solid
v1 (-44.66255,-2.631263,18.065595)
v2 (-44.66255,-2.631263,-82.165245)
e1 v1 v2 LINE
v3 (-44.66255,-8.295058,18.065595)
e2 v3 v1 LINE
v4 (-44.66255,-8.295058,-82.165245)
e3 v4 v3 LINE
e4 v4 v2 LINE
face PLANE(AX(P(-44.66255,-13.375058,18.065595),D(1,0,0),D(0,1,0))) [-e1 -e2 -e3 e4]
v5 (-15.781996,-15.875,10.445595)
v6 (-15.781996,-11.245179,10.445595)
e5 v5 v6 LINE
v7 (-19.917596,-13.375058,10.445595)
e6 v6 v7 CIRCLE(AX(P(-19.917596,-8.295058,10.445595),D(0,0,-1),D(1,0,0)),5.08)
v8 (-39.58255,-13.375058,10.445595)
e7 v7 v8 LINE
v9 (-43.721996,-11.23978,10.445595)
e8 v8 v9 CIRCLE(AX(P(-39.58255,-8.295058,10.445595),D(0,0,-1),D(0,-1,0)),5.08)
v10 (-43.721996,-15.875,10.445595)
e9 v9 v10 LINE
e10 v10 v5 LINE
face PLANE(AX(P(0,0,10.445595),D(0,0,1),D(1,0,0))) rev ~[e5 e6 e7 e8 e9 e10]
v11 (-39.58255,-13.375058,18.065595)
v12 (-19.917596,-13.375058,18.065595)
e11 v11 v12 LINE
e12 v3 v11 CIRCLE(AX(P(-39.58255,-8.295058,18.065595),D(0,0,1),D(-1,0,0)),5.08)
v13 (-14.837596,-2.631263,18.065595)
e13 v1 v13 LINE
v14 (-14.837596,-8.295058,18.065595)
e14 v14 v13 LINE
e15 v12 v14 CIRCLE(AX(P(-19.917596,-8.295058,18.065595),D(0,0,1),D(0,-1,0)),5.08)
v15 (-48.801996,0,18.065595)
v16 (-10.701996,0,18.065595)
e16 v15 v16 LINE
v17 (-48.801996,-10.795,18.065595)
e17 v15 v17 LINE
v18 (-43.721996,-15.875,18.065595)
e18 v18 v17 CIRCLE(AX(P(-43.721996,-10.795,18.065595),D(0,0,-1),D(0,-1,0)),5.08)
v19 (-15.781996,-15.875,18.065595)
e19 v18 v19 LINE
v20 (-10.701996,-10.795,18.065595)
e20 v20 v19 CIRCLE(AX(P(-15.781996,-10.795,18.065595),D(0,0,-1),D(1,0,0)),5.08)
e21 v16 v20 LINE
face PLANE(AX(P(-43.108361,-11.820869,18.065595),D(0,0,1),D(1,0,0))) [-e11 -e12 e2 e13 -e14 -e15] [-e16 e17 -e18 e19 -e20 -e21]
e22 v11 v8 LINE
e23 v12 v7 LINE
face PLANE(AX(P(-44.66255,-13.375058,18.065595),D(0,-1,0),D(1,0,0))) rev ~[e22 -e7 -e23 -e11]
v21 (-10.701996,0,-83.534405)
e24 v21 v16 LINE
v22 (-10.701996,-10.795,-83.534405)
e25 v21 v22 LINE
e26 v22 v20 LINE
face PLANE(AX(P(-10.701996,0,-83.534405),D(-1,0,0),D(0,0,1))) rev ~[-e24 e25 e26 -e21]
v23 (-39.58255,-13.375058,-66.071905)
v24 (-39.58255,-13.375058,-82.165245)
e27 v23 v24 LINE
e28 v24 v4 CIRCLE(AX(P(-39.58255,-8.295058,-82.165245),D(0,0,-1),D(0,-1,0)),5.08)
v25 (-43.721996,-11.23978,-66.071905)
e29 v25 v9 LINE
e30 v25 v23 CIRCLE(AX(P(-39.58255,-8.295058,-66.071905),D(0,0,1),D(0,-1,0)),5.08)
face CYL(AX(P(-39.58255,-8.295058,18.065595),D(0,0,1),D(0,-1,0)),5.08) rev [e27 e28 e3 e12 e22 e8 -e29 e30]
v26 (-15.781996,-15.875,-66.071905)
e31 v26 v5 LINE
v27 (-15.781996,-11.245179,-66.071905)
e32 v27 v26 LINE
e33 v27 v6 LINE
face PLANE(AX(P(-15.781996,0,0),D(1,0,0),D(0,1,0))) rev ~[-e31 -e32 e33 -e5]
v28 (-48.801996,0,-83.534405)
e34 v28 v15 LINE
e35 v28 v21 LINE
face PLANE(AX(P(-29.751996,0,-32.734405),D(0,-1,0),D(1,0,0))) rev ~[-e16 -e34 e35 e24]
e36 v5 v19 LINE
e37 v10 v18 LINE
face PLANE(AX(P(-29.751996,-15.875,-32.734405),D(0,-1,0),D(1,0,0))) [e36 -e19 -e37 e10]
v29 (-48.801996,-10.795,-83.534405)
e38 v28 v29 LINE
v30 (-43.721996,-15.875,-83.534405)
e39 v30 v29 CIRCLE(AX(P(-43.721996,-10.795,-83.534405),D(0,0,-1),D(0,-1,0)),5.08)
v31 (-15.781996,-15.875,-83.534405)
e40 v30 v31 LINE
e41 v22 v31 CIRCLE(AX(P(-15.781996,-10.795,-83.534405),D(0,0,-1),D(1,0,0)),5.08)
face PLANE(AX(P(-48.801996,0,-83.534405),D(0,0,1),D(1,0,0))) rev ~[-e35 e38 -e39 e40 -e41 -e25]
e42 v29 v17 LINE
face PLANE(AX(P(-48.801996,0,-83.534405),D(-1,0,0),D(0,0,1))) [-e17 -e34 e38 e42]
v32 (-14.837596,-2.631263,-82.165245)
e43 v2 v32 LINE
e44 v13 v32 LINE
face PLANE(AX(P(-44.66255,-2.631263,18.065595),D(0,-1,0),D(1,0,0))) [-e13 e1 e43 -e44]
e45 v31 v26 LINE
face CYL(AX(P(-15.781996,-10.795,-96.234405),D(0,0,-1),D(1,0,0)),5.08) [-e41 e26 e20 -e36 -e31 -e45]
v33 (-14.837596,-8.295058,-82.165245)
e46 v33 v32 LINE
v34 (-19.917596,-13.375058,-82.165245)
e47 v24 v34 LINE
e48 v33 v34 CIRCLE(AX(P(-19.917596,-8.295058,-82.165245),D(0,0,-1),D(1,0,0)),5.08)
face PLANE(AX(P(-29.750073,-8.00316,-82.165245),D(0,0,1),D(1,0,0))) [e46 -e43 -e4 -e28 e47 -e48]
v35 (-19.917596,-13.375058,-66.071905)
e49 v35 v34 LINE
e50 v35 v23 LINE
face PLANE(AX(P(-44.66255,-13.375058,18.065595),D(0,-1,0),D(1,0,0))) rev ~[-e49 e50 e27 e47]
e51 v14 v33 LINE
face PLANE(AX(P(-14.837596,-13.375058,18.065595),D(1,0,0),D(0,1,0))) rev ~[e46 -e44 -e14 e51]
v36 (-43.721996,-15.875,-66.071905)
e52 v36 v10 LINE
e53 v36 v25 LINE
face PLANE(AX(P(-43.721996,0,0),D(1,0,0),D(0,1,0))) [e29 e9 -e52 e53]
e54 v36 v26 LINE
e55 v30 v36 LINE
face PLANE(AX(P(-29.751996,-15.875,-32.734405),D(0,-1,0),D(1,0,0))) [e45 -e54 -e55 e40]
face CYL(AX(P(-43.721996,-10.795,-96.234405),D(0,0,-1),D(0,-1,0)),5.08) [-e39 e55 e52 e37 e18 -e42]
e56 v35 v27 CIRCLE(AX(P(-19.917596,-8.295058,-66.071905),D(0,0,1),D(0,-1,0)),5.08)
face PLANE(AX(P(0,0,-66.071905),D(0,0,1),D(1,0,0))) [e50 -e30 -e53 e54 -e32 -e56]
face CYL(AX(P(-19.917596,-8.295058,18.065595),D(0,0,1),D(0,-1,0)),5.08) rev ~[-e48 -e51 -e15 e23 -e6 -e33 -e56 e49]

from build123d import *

# Parameters (mm, degrees)
F0_W         = 38.1
F0_H         = 101.6
F1_DEPTH     = 15.875
F2_W         = 27.94
F2_H         = 76.5175
F3_DEPTH     = 12.7
F4_W         = 29.8249544576
F4_H         = 10.7437949628
F5_DEPTH     = 100.23084
F6_T4_DEPTH  = 100.23084
F6_T10_DEPTH = 100.23084
F6_T16_DEPTH = 100.23084
F6_T23_DEPTH = 100.23084
F6_T29_DEPTH = 100.23084
F6_T35_DEPTH = 100.23084
F6_T41_DEPTH = 100.23084
F6_T47_DEPTH = 100.23084
F6_T54_DEPTH = 100.23084
F6_T60_DEPTH = 100.23084
F6_T63_DEPTH = 127


# Not quite as in the source:
# - a fillet or chamfer that OpenCascade refuses, or shapes differently, is made with other operations: its cross-section is extruded or revolved along the edge and cut away or added


with BuildPart() as f1:
    # F0 (on Front) → F1 (new body)
    with BuildSketch(Plane.XZ):
        with Locations((-29.7519958138, -32.7344046354)):
            Rectangle(F0_W, F0_H)
    extrude(amount=F1_DEPTH)

    # F2 (on face) → F3 (cut)
    with BuildSketch(Plane.XZ.offset(15.875)):
        with Locations((-29.7519958138, -27.8131546354)):
            Rectangle(F2_W, F2_H)
    extrude(amount=-F3_DEPTH, mode=Mode.SUBTRACT)

    # F4 (on face) → F5 (cut)
    with BuildSketch(Plane.XY.offset(18.0655953646)):
        with Locations((-29.750072863, -8.0031603575)):
            Rectangle(F4_W, F4_H)
    extrude(amount=-F5_DEPTH, mode=Mode.SUBTRACT)

    # F6: fillet of radius 5.08 on 4 edges, made by hand


with BuildPart() as f6_tool2:
    # F6_s3 → F6_t4 (new body)
    with BuildSketch(Plane.XY.offset(18.0655953646)):
        with BuildLine():
            ThreePointArc((-19.9175956342, -13.3750578389), (-16.3254931857, -11.8871602873), (-14.8375956342, -8.2950578389))
            Line((-14.8375956342, -8.2950578389), (-14.8375956342, -13.3750578389))
            Line((-14.8375956342, -13.3750578389), (-19.9175956342, -13.3750578389))
        make_face()
    extrude(amount=-F6_T4_DEPTH)

    split(bisect_by=Plane.YZ.offset(-15.7819958138), keep=Keep.BOTTOM)

    split(bisect_by=Plane.XY.offset(10.4455953646), keep=Keep.TOP)


with BuildPart() as f1_1:
    add(f1.part)

    # F6_t1: union F6_tool2
    add(f6_tool2.part)


with BuildPart() as f6_tool8:
    # F6_s9 → F6_t10 (new body)
    with BuildSketch(Plane.XY.offset(18.0655953646)):
        with BuildLine():
            ThreePointArc((-19.9175956342, -13.3750578389), (-16.3254931857, -11.8871602873), (-14.8375956342, -8.2950578389))
            Line((-14.8375956342, -8.2950578389), (-14.8375956342, -13.3750578389))
            Line((-14.8375956342, -13.3750578389), (-19.9175956342, -13.3750578389))
        make_face()
    extrude(amount=-F6_T10_DEPTH)

    split(bisect_by=Plane.YZ.offset(-15.7819958138), keep=Keep.TOP)

    split(bisect_by=Plane.XY.offset(10.4455953646), keep=Keep.TOP)


with BuildPart() as f1_2:
    add(f1_1.part)

    # F6_t7: union F6_tool8
    add(f6_tool8.part)


with BuildPart() as f6_tool14:
    # F6_s15 → F6_t16 (new body)
    with BuildSketch(Plane.XY.offset(18.0655953646)):
        with BuildLine():
            ThreePointArc((-19.9175956342, -13.3750578389), (-16.3254931857, -11.8871602873), (-14.8375956342, -8.2950578389))
            Line((-14.8375956342, -8.2950578389), (-14.8375956342, -13.3750578389))
            Line((-14.8375956342, -13.3750578389), (-19.9175956342, -13.3750578389))
        make_face()
    extrude(amount=-F6_T16_DEPTH)

    split(bisect_by=Plane.XY.offset(-66.0719046354), keep=Keep.TOP)

    split(bisect_by=Plane.YZ.offset(-15.7819958138), keep=Keep.TOP)

    split(bisect_by=Plane.XY.offset(10.4455953646), keep=Keep.BOTTOM)


with BuildPart() as f1_3:
    add(f1_2.part)

    # F6_t13: union F6_tool14
    add(f6_tool14.part)


with BuildPart() as f6_tool21:
    # F6_s22 → F6_t23 (new body)
    with BuildSketch(Plane.XY.offset(18.0655953646)):
        with BuildLine():
            ThreePointArc((-19.9175956342, -13.3750578389), (-16.3254931857, -11.8871602873), (-14.8375956342, -8.2950578389))
            Line((-14.8375956342, -8.2950578389), (-14.8375956342, -13.3750578389))
            Line((-14.8375956342, -13.3750578389), (-19.9175956342, -13.3750578389))
        make_face()
    extrude(amount=-F6_T23_DEPTH)

    split(bisect_by=Plane.XY.offset(-66.0719046354), keep=Keep.BOTTOM)

    split(bisect_by=Plane.YZ.offset(-15.7819958138), keep=Keep.BOTTOM)


with BuildPart() as f1_4:
    add(f1_3.part)

    # F6_t20: union F6_tool21
    add(f6_tool21.part)


with BuildPart() as f6_tool27:
    # F6_s28 → F6_t29 (new body)
    with BuildSketch(Plane.XY.offset(18.0655953646)):
        with BuildLine():
            ThreePointArc((-19.9175956342, -13.3750578389), (-16.3254931857, -11.8871602873), (-14.8375956342, -8.2950578389))
            Line((-14.8375956342, -8.2950578389), (-14.8375956342, -13.3750578389))
            Line((-14.8375956342, -13.3750578389), (-19.9175956342, -13.3750578389))
        make_face()
    extrude(amount=-F6_T29_DEPTH)

    split(bisect_by=Plane.XY.offset(-66.0719046354), keep=Keep.BOTTOM)

    split(bisect_by=Plane.YZ.offset(-15.7819958138), keep=Keep.TOP)


with BuildPart() as f1_5:
    add(f1_4.part)

    # F6_t26: union F6_tool27
    add(f6_tool27.part)


with BuildPart() as f6_tool33:
    # F6_s34 → F6_t35 (new body)
    with BuildSketch(Plane.XY.offset(18.0655953646)):
        with BuildLine():
            ThreePointArc((-39.5825500917, -13.3750578389), (-43.1746525402, -11.8871602873), (-44.6625500917, -8.2950578389))
            Line((-44.6625500917, -8.2950578389), (-44.6625500917, -13.3750578389))
            Line((-44.6625500917, -13.3750578389), (-39.5825500917, -13.3750578389))
        make_face()
    extrude(amount=-F6_T35_DEPTH)

    split(bisect_by=Plane.YZ.offset(-43.7219958138), keep=Keep.TOP)

    split(bisect_by=Plane.XY.offset(10.4455953646), keep=Keep.TOP)


with BuildPart() as f1_6:
    add(f1_5.part)

    # F6_t32: union F6_tool33
    add(f6_tool33.part)


with BuildPart() as f6_tool39:
    # F6_s40 → F6_t41 (new body)
    with BuildSketch(Plane.XY.offset(18.0655953646)):
        with BuildLine():
            ThreePointArc((-39.5825500917, -13.3750578389), (-43.1746525402, -11.8871602873), (-44.6625500917, -8.2950578389))
            Line((-44.6625500917, -8.2950578389), (-44.6625500917, -13.3750578389))
            Line((-44.6625500917, -13.3750578389), (-39.5825500917, -13.3750578389))
        make_face()
    extrude(amount=-F6_T41_DEPTH)

    split(bisect_by=Plane.YZ.offset(-43.7219958138), keep=Keep.BOTTOM)

    split(bisect_by=Plane.XY.offset(10.4455953646), keep=Keep.TOP)


with BuildPart() as f1_7:
    add(f1_6.part)

    # F6_t38: union F6_tool39
    add(f6_tool39.part)


with BuildPart() as f6_tool45:
    # F6_s46 → F6_t47 (new body)
    with BuildSketch(Plane.XY.offset(18.0655953646)):
        with BuildLine():
            ThreePointArc((-39.5825500917, -13.3750578389), (-43.1746525402, -11.8871602873), (-44.6625500917, -8.2950578389))
            Line((-44.6625500917, -8.2950578389), (-44.6625500917, -13.3750578389))
            Line((-44.6625500917, -13.3750578389), (-39.5825500917, -13.3750578389))
        make_face()
    extrude(amount=-F6_T47_DEPTH)

    split(bisect_by=Plane.YZ.offset(-43.7219958138), keep=Keep.BOTTOM)

    split(bisect_by=Plane.XY.offset(-66.0719046354), keep=Keep.TOP)

    split(bisect_by=Plane.XY.offset(10.4455953646), keep=Keep.BOTTOM)


with BuildPart() as f1_8:
    add(f1_7.part)

    # F6_t44: union F6_tool45
    add(f6_tool45.part)


with BuildPart() as f6_tool52:
    # F6_s53 → F6_t54 (new body)
    with BuildSketch(Plane.XY.offset(18.0655953646)):
        with BuildLine():
            ThreePointArc((-39.5825500917, -13.3750578389), (-43.1746525402, -11.8871602873), (-44.6625500917, -8.2950578389))
            Line((-44.6625500917, -8.2950578389), (-44.6625500917, -13.3750578389))
            Line((-44.6625500917, -13.3750578389), (-39.5825500917, -13.3750578389))
        make_face()
    extrude(amount=-F6_T54_DEPTH)

    split(bisect_by=Plane.YZ.offset(-43.7219958138), keep=Keep.TOP)

    split(bisect_by=Plane.XY.offset(-66.0719046354), keep=Keep.BOTTOM)


with BuildPart() as f1_9:
    add(f1_8.part)

    # F6_t51: union F6_tool52
    add(f6_tool52.part)


with BuildPart() as f6_tool58:
    # F6_s59 → F6_t60 (new body)
    with BuildSketch(Plane.XY.offset(18.0655953646)):
        with BuildLine():
            ThreePointArc((-39.5825500917, -13.3750578389), (-43.1746525402, -11.8871602873), (-44.6625500917, -8.2950578389))
            Line((-44.6625500917, -8.2950578389), (-44.6625500917, -13.3750578389))
            Line((-44.6625500917, -13.3750578389), (-39.5825500917, -13.3750578389))
        make_face()
    extrude(amount=-F6_T60_DEPTH)

    split(bisect_by=Plane.YZ.offset(-43.7219958138), keep=Keep.BOTTOM)

    split(bisect_by=Plane.XY.offset(-66.0719046354), keep=Keep.BOTTOM)


with BuildPart() as f1_10:
    add(f1_9.part)

    # F6_t57: union F6_tool58
    add(f6_tool58.part)

    # F6_s64 → F6_t63 (cut)
    with BuildSketch(Plane.XY.offset(-96.2344046354)):
        with BuildLine():
            ThreePointArc((-10.7019958138, -10.795), (-12.1898933654, -14.3871024484), (-15.7819958138, -15.875))
            Line((-15.7819958138, -15.875), (-10.7019958138, -15.875))
            Line((-10.7019958138, -15.875), (-10.7019958138, -10.795))
        make_face()
        with BuildLine():
            ThreePointArc((-43.7219958138, -15.875), (-47.3140982623, -14.3871024484), (-48.8019958138, -10.795))
            Line((-48.8019958138, -10.795), (-48.8019958138, -15.875))
            Line((-48.8019958138, -15.875), (-43.7219958138, -15.875))
        make_face()
    extrude(amount=F6_T63_DEPTH, mode=Mode.SUBTRACT)


solid = f1_10.part
